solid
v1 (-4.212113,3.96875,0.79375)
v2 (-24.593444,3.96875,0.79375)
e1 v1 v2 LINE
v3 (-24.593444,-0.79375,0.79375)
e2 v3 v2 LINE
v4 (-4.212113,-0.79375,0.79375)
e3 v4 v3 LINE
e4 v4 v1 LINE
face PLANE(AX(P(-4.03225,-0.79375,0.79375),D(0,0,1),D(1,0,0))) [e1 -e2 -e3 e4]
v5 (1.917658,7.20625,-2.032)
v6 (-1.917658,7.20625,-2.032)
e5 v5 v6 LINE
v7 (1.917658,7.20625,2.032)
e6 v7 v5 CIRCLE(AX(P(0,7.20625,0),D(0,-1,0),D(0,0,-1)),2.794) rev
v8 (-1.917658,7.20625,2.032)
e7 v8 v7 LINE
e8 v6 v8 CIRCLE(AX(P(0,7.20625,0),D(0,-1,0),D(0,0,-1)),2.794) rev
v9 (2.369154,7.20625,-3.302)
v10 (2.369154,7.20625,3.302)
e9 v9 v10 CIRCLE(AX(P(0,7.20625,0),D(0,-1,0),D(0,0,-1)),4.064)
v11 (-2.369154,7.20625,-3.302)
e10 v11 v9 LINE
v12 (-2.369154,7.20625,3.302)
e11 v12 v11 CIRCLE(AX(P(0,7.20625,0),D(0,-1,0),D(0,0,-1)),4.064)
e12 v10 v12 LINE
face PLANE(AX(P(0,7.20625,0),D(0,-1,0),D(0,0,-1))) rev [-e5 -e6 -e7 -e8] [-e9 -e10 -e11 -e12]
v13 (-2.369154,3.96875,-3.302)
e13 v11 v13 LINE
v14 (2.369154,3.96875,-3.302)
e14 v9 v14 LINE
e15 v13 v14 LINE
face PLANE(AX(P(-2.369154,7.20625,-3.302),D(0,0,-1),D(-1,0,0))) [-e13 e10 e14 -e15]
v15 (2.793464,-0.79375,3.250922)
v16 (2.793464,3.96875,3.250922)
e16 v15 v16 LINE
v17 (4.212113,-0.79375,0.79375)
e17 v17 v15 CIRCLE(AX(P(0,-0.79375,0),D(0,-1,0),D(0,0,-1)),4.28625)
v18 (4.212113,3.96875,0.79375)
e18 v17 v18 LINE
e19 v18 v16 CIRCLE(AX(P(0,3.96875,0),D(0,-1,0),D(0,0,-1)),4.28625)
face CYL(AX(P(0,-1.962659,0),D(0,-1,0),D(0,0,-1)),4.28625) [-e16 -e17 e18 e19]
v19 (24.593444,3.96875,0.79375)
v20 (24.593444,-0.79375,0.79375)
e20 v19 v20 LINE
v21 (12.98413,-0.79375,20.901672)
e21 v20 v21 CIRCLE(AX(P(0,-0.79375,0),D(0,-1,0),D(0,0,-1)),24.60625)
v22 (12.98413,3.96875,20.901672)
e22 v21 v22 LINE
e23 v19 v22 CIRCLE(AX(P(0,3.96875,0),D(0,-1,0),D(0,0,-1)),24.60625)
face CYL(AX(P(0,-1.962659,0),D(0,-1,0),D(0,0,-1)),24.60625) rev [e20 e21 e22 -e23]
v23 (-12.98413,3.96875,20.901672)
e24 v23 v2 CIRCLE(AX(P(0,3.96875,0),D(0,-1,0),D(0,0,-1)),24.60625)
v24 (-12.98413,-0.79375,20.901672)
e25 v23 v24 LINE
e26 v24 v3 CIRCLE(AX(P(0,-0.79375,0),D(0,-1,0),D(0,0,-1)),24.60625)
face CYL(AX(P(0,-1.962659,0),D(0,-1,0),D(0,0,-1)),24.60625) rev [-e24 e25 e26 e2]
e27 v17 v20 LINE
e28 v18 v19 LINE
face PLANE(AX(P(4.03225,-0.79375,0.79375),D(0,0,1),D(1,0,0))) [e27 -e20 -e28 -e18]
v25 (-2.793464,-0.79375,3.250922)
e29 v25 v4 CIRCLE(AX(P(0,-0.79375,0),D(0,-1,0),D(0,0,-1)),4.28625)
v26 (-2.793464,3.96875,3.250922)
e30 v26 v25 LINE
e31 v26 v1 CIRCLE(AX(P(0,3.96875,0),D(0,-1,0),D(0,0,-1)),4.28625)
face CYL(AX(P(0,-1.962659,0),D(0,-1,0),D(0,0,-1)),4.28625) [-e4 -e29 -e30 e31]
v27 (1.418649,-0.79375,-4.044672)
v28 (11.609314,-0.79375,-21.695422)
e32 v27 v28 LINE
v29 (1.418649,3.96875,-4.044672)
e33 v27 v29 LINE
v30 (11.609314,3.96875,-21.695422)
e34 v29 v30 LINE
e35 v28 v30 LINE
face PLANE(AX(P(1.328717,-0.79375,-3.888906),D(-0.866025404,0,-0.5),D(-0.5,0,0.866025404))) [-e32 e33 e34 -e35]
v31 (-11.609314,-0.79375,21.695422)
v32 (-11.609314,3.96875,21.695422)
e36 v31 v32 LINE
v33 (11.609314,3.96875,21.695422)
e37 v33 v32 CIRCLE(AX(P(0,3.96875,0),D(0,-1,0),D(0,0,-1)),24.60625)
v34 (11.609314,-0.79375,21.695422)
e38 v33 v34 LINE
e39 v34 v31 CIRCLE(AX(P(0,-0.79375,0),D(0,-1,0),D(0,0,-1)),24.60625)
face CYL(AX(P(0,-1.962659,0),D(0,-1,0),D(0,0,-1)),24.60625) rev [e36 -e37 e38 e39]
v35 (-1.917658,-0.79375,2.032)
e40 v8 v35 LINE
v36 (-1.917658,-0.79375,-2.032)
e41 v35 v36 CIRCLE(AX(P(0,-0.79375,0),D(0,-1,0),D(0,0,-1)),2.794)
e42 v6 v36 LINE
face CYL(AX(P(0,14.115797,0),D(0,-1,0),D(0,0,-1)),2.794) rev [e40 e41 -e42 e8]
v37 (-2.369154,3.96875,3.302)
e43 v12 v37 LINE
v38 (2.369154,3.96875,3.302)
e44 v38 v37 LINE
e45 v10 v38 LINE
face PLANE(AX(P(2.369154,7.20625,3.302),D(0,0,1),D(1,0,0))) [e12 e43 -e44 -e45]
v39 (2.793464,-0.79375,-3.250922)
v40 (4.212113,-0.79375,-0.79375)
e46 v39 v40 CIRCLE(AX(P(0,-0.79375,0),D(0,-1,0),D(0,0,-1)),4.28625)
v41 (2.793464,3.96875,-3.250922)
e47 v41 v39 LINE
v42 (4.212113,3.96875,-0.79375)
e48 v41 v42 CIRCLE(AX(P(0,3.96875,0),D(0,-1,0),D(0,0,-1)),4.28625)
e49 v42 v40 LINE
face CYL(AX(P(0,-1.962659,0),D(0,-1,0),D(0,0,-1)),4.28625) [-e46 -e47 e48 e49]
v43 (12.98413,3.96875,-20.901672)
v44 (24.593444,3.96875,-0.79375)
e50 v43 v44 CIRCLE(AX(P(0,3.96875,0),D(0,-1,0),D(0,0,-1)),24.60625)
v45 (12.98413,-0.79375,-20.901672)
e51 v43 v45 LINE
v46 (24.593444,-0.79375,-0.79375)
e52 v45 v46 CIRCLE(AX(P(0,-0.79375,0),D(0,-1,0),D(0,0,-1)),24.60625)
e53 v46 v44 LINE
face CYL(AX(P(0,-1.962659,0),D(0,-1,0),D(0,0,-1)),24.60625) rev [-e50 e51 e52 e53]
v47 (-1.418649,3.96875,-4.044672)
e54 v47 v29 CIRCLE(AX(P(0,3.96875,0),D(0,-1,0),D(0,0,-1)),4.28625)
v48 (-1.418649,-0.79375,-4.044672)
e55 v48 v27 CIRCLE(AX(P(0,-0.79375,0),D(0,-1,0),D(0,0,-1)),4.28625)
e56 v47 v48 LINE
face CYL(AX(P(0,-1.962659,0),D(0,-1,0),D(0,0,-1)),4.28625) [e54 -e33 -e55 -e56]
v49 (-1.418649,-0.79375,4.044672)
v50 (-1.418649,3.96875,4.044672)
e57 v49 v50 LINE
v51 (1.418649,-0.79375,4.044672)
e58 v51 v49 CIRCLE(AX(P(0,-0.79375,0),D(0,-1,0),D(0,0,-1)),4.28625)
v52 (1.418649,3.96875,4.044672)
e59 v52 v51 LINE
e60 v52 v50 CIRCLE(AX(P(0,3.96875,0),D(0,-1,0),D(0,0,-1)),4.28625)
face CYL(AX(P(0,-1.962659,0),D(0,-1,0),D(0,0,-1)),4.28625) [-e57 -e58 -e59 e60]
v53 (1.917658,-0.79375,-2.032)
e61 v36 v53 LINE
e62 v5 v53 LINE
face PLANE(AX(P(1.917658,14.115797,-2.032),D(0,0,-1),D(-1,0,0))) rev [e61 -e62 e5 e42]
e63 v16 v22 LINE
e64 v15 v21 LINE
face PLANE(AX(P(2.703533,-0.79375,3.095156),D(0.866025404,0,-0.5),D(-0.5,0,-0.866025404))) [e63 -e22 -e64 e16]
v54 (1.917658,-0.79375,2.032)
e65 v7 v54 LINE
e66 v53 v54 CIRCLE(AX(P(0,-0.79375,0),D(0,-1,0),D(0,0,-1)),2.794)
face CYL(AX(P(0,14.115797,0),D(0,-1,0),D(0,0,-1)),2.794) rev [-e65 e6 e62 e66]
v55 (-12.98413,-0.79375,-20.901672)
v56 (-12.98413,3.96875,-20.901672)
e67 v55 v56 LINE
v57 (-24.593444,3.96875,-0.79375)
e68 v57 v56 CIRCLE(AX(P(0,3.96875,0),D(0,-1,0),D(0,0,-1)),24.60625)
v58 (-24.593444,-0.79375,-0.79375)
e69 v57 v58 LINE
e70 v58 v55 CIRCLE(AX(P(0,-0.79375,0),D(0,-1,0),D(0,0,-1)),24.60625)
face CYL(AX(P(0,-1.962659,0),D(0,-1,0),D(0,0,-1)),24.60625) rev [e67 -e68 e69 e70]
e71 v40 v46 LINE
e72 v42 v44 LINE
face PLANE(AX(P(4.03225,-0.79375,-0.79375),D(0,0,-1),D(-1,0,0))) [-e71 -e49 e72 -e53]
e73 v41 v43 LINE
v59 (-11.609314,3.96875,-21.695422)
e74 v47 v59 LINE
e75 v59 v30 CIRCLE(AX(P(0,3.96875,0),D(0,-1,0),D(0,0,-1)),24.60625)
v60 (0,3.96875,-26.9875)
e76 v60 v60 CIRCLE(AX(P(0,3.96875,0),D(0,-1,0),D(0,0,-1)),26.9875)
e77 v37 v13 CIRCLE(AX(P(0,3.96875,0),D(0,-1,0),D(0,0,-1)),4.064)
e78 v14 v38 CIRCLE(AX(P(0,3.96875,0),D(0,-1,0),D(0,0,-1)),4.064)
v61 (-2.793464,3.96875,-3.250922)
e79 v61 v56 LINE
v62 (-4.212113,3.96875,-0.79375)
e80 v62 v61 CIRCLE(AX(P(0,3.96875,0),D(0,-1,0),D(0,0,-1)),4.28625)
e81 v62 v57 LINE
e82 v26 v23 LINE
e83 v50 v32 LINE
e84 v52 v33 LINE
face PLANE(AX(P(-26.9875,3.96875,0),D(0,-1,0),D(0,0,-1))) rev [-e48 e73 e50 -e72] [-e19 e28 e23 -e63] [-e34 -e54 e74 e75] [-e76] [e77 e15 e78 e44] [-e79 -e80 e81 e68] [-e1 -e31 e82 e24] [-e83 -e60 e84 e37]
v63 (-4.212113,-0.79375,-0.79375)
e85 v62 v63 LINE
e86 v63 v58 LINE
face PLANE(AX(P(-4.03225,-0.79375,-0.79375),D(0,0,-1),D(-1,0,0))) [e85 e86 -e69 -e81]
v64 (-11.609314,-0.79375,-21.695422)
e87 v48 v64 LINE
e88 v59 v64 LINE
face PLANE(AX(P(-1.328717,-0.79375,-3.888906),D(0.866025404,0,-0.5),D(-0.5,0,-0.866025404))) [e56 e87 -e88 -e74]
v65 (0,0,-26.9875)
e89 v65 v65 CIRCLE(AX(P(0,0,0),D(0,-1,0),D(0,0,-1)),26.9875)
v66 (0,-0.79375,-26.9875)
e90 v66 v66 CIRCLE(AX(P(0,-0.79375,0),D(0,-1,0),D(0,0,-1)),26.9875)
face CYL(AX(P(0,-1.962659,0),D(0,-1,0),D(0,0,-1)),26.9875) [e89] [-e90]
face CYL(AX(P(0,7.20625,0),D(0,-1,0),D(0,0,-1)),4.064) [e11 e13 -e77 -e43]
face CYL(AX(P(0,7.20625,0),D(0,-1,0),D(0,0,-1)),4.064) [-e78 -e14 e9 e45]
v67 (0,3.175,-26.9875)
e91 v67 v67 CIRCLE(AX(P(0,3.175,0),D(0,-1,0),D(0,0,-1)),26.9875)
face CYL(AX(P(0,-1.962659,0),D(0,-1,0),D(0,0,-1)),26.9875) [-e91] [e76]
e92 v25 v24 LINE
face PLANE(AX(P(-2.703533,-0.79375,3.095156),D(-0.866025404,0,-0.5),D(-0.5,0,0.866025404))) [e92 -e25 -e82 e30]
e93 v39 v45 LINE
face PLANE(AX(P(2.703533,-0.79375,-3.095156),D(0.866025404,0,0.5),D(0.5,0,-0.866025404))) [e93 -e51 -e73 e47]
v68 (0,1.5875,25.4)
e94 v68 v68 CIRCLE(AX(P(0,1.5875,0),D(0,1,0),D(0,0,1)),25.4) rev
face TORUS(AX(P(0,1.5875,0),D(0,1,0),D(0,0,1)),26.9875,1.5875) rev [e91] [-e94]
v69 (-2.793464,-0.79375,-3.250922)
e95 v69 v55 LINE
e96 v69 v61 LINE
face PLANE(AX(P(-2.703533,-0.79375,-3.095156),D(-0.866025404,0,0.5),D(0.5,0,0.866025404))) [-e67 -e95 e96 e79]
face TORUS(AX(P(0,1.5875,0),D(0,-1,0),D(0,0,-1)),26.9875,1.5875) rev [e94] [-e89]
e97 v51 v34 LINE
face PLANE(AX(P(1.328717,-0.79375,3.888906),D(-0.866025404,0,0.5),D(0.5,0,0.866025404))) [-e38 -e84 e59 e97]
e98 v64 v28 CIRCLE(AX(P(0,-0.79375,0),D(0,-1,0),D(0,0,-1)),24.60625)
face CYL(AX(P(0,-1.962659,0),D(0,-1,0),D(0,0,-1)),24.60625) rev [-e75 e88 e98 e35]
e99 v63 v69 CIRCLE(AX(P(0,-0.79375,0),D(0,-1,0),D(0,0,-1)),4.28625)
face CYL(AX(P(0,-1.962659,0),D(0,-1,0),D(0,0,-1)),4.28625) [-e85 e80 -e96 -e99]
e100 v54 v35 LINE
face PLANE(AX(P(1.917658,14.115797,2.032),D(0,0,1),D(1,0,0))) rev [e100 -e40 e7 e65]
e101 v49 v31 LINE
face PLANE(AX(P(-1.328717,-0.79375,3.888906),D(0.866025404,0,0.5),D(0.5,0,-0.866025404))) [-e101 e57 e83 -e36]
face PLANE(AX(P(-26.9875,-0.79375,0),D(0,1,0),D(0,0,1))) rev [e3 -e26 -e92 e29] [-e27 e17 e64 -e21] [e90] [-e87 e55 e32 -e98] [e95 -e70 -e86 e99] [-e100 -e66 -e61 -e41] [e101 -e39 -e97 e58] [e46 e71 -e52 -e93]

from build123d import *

# Parameters (mm, degrees)
INNERWHEEL_START                            = -0.79375
INNERWHEEL_OUTLINE_R                        = 4.28625
INNERWHEEL_DEPTH                            = 4.7625
CONNECTIONINNEROUTER_REACH                  = 43.498
CONNECTIONINNEROUTER_END_RADIUS             = 24.60625
SKETCH3_W                                   = 1.5875
SKETCH3_H                                   = 4.7625
CONNECTIONINNEROUTER_DIRECTION_2_REACH      = 43.498
CONNECTIONINNEROUTER_DIRECTION_2_END_RADIUS = 4.28625
CIRCULARPATTERN_COUNT                       = 6
MOTORSUPPORTEXTRUDE_DEPTH                   = 8
MOTORSUPPORTCUT_START                       = -8
MOTORSUPPORTCUT_DEPTH                       = 8
TIREFILLET_R                                = 1.5875


# Read off the part's stored shape, not the designer's step: InnerWheel
with BuildPart() as part:
    # OuterWheelSketch → OuterWheel (revolve)
    with BuildSketch(Plane.XY, mode=Mode.PRIVATE) as outerwheel_sk:
        Polygon((-25.4, 0), (-26.9875, 0), (-26.9875, -0.79375), (-24.60625, -0.79375), (-24.60625, 3.96875), (-26.9875, 3.96875), (-26.9875, 3.175), (-25.4, 3.175), align=None)
    revolve(outerwheel_sk.sketch.rotate(Axis((0, -1.962659061, 0), (0, 1, 0)), 270), axis=Axis((0, -1.962659061, 0), (0, 1, 0)))



with BuildPart() as body_2:
    # InnerWheel outline → InnerWheel (new body)
    with BuildSketch(Plane(origin=(0, 0, 0), x_dir=(1, 0, 0), z_dir=(0, 1, 0)).offset(INNERWHEEL_START)):
        Circle(INNERWHEEL_OUTLINE_R)
    extrude(amount=INNERWHEEL_DEPTH)


with BuildPart() as part_1:
    add(part.part)

    add(body_2.part)  # ConnectionInnerOuter merges body 2
    # ConnectionInnerOuter: up to this cylinder (the profile starts inside it)
    connectioninnerouter_end = Plane(origin=(0, 1.5875, 0), z_dir=(0, -1, 0)) * Cylinder(CONNECTIONINNEROUTER_END_RADIUS, 137.2085, mode=Mode.PRIVATE)
    # Sketch3 → ConnectionInnerOuter (add, up to the surface)
    with BuildSketch(Plane(origin=(4.28625, 0, 0), x_dir=(0, 0, -1), z_dir=(1, 0, 0)), mode=Mode.PRIVATE) as connectioninnerouter_sk1:
        with Locations((0, 1.5875)):
            Rectangle(SKETCH3_W, SKETCH3_H)
    connectioninnerouter_tool1 = extrude(connectioninnerouter_sk1.sketch, amount=CONNECTIONINNEROUTER_REACH, mode=Mode.PRIVATE) & connectioninnerouter_end
    connectioninnerouter = connectioninnerouter_tool1.solids().sort_by_distance((4.28625, 1.5875, 0))[0]
    add(connectioninnerouter)

    # ConnectionInnerOuter direction 2: up to this cylinder (the profile starts outside it)
    connectioninnerouter_direction_2_end = Plane(origin=(0, 1.5875, 0), z_dir=(0, -1, 0)) * Cylinder(CONNECTIONINNEROUTER_DIRECTION_2_END_RADIUS, 96.5685, mode=Mode.PRIVATE)
    # Sketch3 → ConnectionInnerOuter direction 2 (add, up to the surface)
    with BuildSketch(Plane(origin=(4.28625, 0, 0), x_dir=(0, 0, -1), z_dir=(1, 0, 0)), mode=Mode.PRIVATE) as connectioninnerouter_direction_2_sk1:
        with Locations((0, 1.5875)):
            Rectangle(SKETCH3_W, SKETCH3_H)
    connectioninnerouter_direction_2_tool1 = extrude(connectioninnerouter_direction_2_sk1.sketch, amount=-CONNECTIONINNEROUTER_DIRECTION_2_REACH, mode=Mode.PRIVATE) - connectioninnerouter_direction_2_end
    connectioninnerouter_direction_2 = connectioninnerouter_direction_2_tool1.solids().sort_by_distance((4.28625, 1.5875, 0))[0] + connectioninnerouter_direction_2_tool1.solids().sort_by_distance((4.28625, 1.5875, 0))[1]
    add(connectioninnerouter_direction_2)
    connectioninnerouter = connectioninnerouter + connectioninnerouter_direction_2  # both directions under the feature's name, for the pattern or mirror that repeats it

    # CircularPattern: ConnectionInnerOuter ×6 about axis
    circularpattern_axis = Axis((0, 0, 0), (0, 1, 0))
    for i in range(1, CIRCULARPATTERN_COUNT):
        add(connectioninnerouter.rotate(circularpattern_axis, i * 360 / CIRCULARPATTERN_COUNT))

    # OuterMottorSupport → MotorSupportExtrude (add)
    with BuildSketch(Plane(origin=(0, -0.79375, 0), x_dir=(-1, 0, 0), z_dir=(0, -1, 0))):
        with BuildLine():
            Line((-2.369154279, -3.302), (2.369154279, -3.302))
            ThreePointArc((2.369154279, -3.302), (4.064, 0), (2.369154279, 3.302))
            Line((2.369154279, 3.302), (-2.369154279, 3.302))
            ThreePointArc((-2.369154279, 3.302), (-4.064, 0), (-2.369154279, -3.302))
        make_face()
    extrude(amount=-MOTORSUPPORTEXTRUDE_DEPTH)

    # InnerMotorSupport → MotorSupportCut (cut)
    with BuildSketch(Plane(origin=(0, -0.79375, 0), x_dir=(-1, 0, 0), z_dir=(0, -1, 0)).offset(MOTORSUPPORTCUT_START)):
        with BuildLine():
            Line((-1.917657947, 2.032), (1.917657947, 2.032))
            ThreePointArc((1.917657947, 2.032), (2.794, 0), (1.917657947, -2.032))
            Line((1.917657947, -2.032), (-1.917657947, -2.032))
            ThreePointArc((-1.917657947, -2.032), (-2.794, 0), (-1.917657947, 2.032))
        make_face()
    extrude(amount=MOTORSUPPORTCUT_DEPTH, mode=Mode.SUBTRACT)

    # TireFillet
    tirefillet_edges = [part_1.edges().sort_by_distance(p)[0] for p in [
        (0, 0, 25.4),
        (0, 3.175, 25.4),
    ]]
    fillet(tirefillet_edges, radius=TIREFILLET_R - 0.0001)  # a hair under: the kernel refuses the full size


solid = part_1.part
